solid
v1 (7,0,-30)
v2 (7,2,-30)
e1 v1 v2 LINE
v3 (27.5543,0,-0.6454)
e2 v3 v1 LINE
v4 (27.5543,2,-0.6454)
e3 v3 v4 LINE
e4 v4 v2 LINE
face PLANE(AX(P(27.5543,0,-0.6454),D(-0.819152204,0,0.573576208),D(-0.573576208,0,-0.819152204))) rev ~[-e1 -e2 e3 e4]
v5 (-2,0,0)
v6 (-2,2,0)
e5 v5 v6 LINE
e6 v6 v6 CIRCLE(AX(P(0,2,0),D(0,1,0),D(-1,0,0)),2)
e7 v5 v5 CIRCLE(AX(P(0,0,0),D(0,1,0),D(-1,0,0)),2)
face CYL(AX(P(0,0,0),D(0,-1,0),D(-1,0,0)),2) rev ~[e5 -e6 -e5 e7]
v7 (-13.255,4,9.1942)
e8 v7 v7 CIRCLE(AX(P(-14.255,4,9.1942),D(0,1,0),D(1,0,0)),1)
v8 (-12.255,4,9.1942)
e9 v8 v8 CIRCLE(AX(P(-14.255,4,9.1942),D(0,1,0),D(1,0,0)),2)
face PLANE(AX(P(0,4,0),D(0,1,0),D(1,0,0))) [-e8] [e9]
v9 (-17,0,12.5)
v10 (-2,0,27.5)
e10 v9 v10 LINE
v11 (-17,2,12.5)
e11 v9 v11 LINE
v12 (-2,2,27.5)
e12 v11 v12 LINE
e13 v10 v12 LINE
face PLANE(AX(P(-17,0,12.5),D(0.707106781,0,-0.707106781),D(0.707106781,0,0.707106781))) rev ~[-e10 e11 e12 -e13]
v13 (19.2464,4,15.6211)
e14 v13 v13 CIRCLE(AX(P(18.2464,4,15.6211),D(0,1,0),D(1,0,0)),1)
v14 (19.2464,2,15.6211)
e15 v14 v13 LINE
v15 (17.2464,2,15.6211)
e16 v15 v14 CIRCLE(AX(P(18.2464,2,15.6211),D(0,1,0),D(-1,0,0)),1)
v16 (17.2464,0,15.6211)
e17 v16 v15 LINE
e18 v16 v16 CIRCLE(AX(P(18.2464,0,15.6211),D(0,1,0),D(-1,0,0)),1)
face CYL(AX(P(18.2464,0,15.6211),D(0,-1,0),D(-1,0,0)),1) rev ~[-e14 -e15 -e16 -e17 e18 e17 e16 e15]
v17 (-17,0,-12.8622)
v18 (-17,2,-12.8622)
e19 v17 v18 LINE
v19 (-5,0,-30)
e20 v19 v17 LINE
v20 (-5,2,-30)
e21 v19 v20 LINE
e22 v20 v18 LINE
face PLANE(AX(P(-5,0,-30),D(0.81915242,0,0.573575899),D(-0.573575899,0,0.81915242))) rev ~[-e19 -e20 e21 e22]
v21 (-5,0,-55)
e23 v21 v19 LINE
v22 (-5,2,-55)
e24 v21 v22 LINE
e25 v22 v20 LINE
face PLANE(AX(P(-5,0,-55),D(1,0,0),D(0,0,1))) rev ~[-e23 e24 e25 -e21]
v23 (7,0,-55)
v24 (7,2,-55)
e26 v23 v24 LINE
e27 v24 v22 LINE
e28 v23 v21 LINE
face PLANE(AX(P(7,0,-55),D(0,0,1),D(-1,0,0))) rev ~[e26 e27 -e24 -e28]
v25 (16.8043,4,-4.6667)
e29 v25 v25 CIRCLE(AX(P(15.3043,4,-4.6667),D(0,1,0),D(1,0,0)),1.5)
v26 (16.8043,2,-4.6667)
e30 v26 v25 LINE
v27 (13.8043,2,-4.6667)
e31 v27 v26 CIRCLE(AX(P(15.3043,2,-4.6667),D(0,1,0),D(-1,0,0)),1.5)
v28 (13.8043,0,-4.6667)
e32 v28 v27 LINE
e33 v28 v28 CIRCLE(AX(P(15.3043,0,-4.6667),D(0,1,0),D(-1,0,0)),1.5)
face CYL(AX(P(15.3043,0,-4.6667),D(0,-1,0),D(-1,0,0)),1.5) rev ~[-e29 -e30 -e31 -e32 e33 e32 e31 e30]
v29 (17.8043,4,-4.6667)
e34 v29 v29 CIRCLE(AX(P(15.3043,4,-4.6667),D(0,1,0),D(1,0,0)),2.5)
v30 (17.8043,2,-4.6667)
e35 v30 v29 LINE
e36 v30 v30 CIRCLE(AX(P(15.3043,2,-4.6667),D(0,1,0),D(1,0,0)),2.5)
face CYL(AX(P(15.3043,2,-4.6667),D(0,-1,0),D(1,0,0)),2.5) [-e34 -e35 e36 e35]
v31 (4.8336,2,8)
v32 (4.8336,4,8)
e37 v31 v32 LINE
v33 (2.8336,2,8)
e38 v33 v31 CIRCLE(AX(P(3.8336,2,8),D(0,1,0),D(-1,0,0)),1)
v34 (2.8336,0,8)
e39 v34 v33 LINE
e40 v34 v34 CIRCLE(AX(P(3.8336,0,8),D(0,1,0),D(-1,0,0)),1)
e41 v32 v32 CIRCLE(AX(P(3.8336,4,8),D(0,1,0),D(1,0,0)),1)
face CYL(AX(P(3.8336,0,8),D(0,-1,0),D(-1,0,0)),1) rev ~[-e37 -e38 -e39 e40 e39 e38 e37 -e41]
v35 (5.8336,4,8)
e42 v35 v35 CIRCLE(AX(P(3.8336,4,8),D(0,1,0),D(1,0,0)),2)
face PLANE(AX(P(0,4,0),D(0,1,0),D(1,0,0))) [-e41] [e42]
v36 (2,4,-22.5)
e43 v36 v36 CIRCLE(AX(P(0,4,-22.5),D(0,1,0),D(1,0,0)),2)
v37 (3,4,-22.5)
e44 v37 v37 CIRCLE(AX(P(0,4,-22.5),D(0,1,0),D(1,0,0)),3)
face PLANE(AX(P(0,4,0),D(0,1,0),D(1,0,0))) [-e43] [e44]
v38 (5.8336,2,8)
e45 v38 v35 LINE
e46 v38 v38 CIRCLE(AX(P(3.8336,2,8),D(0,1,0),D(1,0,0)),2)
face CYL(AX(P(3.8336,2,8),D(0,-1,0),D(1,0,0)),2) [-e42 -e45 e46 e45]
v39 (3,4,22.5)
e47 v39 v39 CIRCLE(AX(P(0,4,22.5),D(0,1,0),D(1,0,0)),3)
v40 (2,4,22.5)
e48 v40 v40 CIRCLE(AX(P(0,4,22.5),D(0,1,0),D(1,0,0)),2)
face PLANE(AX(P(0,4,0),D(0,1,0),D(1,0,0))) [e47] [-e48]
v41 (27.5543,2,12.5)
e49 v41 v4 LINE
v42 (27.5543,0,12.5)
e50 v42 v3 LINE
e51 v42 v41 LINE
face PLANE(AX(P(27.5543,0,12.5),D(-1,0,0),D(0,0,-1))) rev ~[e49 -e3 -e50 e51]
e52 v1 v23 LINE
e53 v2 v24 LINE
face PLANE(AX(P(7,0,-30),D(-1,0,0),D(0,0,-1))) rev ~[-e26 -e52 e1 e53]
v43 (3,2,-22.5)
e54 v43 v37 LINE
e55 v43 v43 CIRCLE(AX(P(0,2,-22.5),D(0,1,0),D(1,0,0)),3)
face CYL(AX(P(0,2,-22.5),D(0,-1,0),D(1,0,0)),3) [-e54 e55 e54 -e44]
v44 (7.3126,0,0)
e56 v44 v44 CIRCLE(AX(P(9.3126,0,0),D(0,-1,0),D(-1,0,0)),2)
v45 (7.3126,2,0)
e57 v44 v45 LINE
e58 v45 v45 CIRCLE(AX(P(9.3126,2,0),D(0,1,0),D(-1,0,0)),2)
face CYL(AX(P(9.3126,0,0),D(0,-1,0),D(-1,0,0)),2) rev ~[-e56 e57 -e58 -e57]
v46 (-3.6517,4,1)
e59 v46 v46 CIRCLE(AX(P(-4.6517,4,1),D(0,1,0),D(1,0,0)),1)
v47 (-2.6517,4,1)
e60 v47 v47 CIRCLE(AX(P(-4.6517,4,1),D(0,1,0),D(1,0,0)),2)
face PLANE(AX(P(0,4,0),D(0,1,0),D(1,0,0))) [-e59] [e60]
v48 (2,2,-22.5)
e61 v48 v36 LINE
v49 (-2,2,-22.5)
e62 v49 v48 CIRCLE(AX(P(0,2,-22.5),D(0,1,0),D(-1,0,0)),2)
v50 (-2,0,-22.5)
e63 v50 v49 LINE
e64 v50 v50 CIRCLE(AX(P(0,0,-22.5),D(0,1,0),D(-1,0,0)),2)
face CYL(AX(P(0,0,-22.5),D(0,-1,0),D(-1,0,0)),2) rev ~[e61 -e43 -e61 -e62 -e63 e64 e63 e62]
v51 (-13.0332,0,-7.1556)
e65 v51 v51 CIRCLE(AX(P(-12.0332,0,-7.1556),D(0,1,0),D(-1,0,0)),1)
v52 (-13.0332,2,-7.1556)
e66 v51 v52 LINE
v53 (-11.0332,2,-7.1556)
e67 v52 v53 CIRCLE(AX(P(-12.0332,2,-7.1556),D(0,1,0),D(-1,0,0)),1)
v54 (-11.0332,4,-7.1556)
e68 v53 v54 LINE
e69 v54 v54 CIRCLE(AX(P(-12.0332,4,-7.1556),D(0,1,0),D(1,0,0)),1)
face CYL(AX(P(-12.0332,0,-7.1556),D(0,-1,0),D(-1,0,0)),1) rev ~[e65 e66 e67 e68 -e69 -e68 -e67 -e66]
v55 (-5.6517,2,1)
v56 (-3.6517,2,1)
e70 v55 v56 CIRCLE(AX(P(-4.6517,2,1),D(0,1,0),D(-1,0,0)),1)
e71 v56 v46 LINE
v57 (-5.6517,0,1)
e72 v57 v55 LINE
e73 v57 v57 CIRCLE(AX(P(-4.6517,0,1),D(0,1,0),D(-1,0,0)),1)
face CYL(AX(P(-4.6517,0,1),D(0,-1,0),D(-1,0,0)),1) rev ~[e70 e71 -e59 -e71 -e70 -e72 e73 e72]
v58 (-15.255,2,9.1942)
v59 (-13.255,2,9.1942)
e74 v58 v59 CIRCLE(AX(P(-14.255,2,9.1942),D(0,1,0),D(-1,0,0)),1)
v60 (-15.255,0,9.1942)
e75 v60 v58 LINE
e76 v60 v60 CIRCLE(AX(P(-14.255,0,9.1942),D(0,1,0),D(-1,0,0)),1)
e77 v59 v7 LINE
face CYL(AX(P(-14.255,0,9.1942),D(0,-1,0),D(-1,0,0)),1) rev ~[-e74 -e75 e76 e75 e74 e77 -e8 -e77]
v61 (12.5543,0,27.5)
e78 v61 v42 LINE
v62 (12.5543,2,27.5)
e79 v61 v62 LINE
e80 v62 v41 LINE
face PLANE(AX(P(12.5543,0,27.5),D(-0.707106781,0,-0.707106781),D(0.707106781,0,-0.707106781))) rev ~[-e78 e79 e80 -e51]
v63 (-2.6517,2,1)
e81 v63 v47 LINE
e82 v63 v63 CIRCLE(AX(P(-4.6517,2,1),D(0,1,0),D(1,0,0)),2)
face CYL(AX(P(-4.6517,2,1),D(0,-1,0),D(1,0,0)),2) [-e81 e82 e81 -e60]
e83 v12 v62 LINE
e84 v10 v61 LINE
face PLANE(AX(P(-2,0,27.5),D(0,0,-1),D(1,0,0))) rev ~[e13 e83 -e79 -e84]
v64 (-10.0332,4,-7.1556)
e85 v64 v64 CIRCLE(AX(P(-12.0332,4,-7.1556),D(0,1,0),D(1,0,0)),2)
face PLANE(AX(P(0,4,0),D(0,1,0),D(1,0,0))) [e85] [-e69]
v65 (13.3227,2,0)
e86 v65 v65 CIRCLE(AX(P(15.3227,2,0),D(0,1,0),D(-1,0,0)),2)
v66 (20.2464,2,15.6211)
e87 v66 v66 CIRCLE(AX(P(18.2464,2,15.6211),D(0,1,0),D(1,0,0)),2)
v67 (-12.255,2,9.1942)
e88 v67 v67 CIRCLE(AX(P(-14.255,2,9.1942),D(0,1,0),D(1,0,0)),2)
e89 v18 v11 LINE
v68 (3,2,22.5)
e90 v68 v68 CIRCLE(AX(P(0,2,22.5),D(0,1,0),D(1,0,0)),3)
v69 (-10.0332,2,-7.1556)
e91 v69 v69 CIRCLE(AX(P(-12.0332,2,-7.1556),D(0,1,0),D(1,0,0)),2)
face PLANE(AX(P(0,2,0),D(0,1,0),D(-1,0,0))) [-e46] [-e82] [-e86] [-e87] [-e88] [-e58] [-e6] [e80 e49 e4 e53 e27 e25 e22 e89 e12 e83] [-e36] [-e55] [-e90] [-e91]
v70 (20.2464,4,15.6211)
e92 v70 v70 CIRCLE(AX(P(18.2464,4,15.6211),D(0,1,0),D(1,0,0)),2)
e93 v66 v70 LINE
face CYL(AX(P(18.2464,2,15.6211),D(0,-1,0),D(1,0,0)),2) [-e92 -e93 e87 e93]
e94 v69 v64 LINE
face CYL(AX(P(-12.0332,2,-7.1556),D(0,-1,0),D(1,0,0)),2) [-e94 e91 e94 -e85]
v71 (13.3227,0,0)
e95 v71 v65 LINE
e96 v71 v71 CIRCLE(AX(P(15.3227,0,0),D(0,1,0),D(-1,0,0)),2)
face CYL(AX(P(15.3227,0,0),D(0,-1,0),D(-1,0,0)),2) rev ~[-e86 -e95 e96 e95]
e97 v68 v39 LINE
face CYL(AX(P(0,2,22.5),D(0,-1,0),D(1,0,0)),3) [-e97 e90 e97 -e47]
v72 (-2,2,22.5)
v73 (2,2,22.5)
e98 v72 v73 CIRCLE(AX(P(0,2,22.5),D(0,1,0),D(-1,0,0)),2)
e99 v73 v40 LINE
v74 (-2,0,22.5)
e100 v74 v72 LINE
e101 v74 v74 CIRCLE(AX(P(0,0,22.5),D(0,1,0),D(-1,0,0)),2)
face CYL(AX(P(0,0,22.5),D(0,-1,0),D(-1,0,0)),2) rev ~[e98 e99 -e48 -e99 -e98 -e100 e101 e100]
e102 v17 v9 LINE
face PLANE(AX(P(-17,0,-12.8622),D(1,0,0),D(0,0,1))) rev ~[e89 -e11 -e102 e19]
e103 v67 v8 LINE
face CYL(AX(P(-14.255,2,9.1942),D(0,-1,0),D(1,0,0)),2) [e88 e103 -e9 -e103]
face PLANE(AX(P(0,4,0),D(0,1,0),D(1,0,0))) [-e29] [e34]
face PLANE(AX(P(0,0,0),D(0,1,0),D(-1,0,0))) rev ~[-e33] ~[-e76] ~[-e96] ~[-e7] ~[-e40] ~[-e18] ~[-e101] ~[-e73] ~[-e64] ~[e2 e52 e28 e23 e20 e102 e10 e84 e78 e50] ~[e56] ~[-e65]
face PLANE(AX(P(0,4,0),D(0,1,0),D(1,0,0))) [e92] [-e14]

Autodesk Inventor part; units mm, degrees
ref_plane "YZ Plane" through (0, 0, 0) normal (1, 0, 0) x (0, 1, 0)
ref_plane "XZ Plane" through (0, 0, 0) normal (0, 1, 0) x (-1, 0, 0)
sketch "Szkic1" plane through (0, 0, 0) normal (0, 1, 0) x (-1, 0, 0)
  circle A0 centre (0, 22.5) radius 2
  circle A1 centre (0, -22.5) radius 2
  circle A2 centre (0, 22.5) radius 11.25 construction
  circle A3 centre (0, -22.5) radius 11.25 construction
  circle A4 centre (0, 0) radius 11.25
  circle A5 centre (-15.3043, -4.6667) radius 4.75 construction
  circle A6 centre (-15.3043, -4.6667) radius 12.25 construction
  circle A7 centre (-18.2464, 15.6211) radius 8.25 construction
  circle A8 centre (-18.2464, 15.6211) radius 1
  circle A9 centre (-15.3043, -4.6667) radius 1.5
  line L0 (17, 55) -> (-27.5543, 55)
  line L1 (-27.5543, 55) -> (-27.5543, -55)
  line L2 (-27.5543, -55) -> (17, -55)
  line L3 (17, -55) -> (17, 55)
  circle A10 centre (0, 22.5) radius 17 construction
  circle A11 centre (0, -22.5) radius 17 construction
  circle A12 centre (0, 0) radius 14.5 construction
  line L4 (12.5, 7.3485) -> (12.5, -7.3485) construction
  line L5 (-12.5, 7.3485) -> (-12.5, -7.3485) construction
  circle A13 centre (12.0332, -7.1556) radius 8.25 construction
  circle A14 centre (12.0332, -7.1556) radius 2.75 construction
  circle A15 centre (14.255, 9.1942) radius 8.25 construction
  circle A16 centre (14.255, 9.1942) radius 1
  circle A17 centre (12.0332, -7.1556) radius 1
  circle A18 centre (-3.8336, 8) radius 8.25 construction
  circle A19 centre (-3.8336, 8) radius 1
  circle A20 centre (-3.8336, 8) radius 2.75 construction
  circle A21 centre (4.6517, 1) radius 8.25 construction
  circle A22 centre (4.6517, 1) radius 1
  circle A23 centre (4.6517, 1) radius 2.75 construction
  line L6 (-27.5543, -0.6454) -> (-7, -30)
  line L7 (-7, -30) -> (-7, -64)
  line L8 (-7, -64) -> (5, -64)
  line L9 (5, -64) -> (5, -30)
  line L10 (5, -30) -> (17, -12.8622)
  line L11 (17, 12.5) -> (2, 27.5)
  line L12 (2, 27.5) -> (-12.5543, 27.5)
  line L13 (-12.5543, 27.5) -> (-27.5543, 12.5)
  circle A24 centre (0, 0) radius 2
  circle A25 centre (-9.3126, 0) radius 11.25 construction
  circle A26 centre (-9.3126, 0) radius 2
  circle A27 centre (-15.3227, 0) radius 11.25 construction
  circle A28 centre (-15.3227, 0) radius 2
  point P0 (-7, -55)
  point P1 (5, -55)
  dimension "d0" = 4
  dimension "d1" = 4
  dimension "d2" = 22.5
  dimension "d3" = 22.5
  dimension "d4" = 22.5
  dimension "d5" = 22.5
  dimension "d6" = 22.5
  dimension "d7" = 9.5
  dimension "d8" = 24.5
  dimension "d9" = 16.5
  dimension "d10" = 2
  dimension "d11" = 3
  dimension "d12" = 34
  dimension "d13" = 34
  dimension "d14" = 29
  dimension "d15" = 25
  dimension "d16" = 17
  dimension "d17" = 55
  dimension "d18" = 110
  dimension "d21" = 16.5
  dimension "d22" = 5.5
  dimension "d23" = 16.5
  dimension "d24" = 45
  dimension "d26" = 2
  dimension "d27" = 2
  dimension "d28" = 16.5
  dimension "d29" = 2
  dimension "d30" = 5.5
  dimension "d33" = 16.5
  dimension "d34" = 27.5543
  dimension "d35" = 2
  dimension "d36" = 5.5
  dimension "d39" = 12
  dimension "d40" = 12
  dimension "d41" = 0
  dimension "d42" = 9
  dimension "d43" = 145
  dimension "d44" = 145
  dimension "d45" = 25
  dimension "d46" = 45
  dimension "d47" = 45
  dimension "d48" = 15
  dimension "d49" = 5
  dimension "d50" = 0
  dimension "d63" = 1
  dimension "d64" = 8
  dimension "d65" = 4
  dimension "d66" = 22.5
  dimension "d67" = 0
  dimension "d68" = 4
  dimension "d69" = 22.5
  dimension "d70" = 0
  dimension "d71" = 4
ref_plane "Płaszczyzna konstrukcyjna1" through (0, 2, 0) normal (0, 1, 0) x (1, 0, 0)
sketch "Szkic2" plane through (0, 2, 0) normal (0, 1, 0) x (1, 0, 0)
  circle A0 centre (0, -22.5) radius 2
  circle A1 centre (-14.255, -9.1942) radius 1
  circle A2 centre (3.8336, -8) radius 1
  circle A3 centre (-4.6517, -1) radius 1
  circle A4 centre (15.3043, 4.6667) radius 1.5
  circle A5 centre (0, 22.5) radius 2
  circle A6 centre (-12.0332, 7.1556) radius 1
  circle A7 centre (18.2464, -15.6211) radius 1
  circle A8 centre (0, -22.5) radius 2 projected
  circle A9 centre (-14.255, -9.1942) radius 1 projected
  circle A10 centre (3.8336, -8) radius 1 projected
  circle A11 centre (-4.6517, -1) radius 1 projected
  circle A12 centre (15.3043, 4.6667) radius 1.5 projected
  circle A13 centre (18.2464, -15.6211) radius 1 projected
  circle A14 centre (0, 22.5) radius 2 projected
  circle A15 centre (-12.0332, 7.1556) radius 1 projected
  circle A16 centre (0, -22.5) radius 3
  circle A17 centre (-14.255, -9.1942) radius 2
  circle A18 centre (3.8336, -8) radius 2
  circle A19 centre (-4.6517, -1) radius 2
  circle A20 centre (18.2464, -15.6211) radius 2
  circle A21 centre (15.3043, 4.6667) radius 2.5
  circle A22 centre (0, 22.5) radius 3
  circle A23 centre (-12.0332, 7.1556) radius 2
  point P0 (0, 0)
  dimension "d53" = 1
  dimension "d54" = 1
  dimension "d55" = 1
  dimension "d56" = 1
  dimension "d57" = 1
  dimension "d58" = 1
  dimension "d59" = 1
  dimension "d60" = 1
extrude "Wyciągnięcie proste6" add sketch "Szkic1" along normal blind 2 contours A4 A26 | L3 L10 L9 L2 L7 L6 L1 L13 L12 L11 picked at (-5.8126, -3.4695)
extrude "Wyciągnięcie proste7" add sketch "Szkic2" along normal blind 2
